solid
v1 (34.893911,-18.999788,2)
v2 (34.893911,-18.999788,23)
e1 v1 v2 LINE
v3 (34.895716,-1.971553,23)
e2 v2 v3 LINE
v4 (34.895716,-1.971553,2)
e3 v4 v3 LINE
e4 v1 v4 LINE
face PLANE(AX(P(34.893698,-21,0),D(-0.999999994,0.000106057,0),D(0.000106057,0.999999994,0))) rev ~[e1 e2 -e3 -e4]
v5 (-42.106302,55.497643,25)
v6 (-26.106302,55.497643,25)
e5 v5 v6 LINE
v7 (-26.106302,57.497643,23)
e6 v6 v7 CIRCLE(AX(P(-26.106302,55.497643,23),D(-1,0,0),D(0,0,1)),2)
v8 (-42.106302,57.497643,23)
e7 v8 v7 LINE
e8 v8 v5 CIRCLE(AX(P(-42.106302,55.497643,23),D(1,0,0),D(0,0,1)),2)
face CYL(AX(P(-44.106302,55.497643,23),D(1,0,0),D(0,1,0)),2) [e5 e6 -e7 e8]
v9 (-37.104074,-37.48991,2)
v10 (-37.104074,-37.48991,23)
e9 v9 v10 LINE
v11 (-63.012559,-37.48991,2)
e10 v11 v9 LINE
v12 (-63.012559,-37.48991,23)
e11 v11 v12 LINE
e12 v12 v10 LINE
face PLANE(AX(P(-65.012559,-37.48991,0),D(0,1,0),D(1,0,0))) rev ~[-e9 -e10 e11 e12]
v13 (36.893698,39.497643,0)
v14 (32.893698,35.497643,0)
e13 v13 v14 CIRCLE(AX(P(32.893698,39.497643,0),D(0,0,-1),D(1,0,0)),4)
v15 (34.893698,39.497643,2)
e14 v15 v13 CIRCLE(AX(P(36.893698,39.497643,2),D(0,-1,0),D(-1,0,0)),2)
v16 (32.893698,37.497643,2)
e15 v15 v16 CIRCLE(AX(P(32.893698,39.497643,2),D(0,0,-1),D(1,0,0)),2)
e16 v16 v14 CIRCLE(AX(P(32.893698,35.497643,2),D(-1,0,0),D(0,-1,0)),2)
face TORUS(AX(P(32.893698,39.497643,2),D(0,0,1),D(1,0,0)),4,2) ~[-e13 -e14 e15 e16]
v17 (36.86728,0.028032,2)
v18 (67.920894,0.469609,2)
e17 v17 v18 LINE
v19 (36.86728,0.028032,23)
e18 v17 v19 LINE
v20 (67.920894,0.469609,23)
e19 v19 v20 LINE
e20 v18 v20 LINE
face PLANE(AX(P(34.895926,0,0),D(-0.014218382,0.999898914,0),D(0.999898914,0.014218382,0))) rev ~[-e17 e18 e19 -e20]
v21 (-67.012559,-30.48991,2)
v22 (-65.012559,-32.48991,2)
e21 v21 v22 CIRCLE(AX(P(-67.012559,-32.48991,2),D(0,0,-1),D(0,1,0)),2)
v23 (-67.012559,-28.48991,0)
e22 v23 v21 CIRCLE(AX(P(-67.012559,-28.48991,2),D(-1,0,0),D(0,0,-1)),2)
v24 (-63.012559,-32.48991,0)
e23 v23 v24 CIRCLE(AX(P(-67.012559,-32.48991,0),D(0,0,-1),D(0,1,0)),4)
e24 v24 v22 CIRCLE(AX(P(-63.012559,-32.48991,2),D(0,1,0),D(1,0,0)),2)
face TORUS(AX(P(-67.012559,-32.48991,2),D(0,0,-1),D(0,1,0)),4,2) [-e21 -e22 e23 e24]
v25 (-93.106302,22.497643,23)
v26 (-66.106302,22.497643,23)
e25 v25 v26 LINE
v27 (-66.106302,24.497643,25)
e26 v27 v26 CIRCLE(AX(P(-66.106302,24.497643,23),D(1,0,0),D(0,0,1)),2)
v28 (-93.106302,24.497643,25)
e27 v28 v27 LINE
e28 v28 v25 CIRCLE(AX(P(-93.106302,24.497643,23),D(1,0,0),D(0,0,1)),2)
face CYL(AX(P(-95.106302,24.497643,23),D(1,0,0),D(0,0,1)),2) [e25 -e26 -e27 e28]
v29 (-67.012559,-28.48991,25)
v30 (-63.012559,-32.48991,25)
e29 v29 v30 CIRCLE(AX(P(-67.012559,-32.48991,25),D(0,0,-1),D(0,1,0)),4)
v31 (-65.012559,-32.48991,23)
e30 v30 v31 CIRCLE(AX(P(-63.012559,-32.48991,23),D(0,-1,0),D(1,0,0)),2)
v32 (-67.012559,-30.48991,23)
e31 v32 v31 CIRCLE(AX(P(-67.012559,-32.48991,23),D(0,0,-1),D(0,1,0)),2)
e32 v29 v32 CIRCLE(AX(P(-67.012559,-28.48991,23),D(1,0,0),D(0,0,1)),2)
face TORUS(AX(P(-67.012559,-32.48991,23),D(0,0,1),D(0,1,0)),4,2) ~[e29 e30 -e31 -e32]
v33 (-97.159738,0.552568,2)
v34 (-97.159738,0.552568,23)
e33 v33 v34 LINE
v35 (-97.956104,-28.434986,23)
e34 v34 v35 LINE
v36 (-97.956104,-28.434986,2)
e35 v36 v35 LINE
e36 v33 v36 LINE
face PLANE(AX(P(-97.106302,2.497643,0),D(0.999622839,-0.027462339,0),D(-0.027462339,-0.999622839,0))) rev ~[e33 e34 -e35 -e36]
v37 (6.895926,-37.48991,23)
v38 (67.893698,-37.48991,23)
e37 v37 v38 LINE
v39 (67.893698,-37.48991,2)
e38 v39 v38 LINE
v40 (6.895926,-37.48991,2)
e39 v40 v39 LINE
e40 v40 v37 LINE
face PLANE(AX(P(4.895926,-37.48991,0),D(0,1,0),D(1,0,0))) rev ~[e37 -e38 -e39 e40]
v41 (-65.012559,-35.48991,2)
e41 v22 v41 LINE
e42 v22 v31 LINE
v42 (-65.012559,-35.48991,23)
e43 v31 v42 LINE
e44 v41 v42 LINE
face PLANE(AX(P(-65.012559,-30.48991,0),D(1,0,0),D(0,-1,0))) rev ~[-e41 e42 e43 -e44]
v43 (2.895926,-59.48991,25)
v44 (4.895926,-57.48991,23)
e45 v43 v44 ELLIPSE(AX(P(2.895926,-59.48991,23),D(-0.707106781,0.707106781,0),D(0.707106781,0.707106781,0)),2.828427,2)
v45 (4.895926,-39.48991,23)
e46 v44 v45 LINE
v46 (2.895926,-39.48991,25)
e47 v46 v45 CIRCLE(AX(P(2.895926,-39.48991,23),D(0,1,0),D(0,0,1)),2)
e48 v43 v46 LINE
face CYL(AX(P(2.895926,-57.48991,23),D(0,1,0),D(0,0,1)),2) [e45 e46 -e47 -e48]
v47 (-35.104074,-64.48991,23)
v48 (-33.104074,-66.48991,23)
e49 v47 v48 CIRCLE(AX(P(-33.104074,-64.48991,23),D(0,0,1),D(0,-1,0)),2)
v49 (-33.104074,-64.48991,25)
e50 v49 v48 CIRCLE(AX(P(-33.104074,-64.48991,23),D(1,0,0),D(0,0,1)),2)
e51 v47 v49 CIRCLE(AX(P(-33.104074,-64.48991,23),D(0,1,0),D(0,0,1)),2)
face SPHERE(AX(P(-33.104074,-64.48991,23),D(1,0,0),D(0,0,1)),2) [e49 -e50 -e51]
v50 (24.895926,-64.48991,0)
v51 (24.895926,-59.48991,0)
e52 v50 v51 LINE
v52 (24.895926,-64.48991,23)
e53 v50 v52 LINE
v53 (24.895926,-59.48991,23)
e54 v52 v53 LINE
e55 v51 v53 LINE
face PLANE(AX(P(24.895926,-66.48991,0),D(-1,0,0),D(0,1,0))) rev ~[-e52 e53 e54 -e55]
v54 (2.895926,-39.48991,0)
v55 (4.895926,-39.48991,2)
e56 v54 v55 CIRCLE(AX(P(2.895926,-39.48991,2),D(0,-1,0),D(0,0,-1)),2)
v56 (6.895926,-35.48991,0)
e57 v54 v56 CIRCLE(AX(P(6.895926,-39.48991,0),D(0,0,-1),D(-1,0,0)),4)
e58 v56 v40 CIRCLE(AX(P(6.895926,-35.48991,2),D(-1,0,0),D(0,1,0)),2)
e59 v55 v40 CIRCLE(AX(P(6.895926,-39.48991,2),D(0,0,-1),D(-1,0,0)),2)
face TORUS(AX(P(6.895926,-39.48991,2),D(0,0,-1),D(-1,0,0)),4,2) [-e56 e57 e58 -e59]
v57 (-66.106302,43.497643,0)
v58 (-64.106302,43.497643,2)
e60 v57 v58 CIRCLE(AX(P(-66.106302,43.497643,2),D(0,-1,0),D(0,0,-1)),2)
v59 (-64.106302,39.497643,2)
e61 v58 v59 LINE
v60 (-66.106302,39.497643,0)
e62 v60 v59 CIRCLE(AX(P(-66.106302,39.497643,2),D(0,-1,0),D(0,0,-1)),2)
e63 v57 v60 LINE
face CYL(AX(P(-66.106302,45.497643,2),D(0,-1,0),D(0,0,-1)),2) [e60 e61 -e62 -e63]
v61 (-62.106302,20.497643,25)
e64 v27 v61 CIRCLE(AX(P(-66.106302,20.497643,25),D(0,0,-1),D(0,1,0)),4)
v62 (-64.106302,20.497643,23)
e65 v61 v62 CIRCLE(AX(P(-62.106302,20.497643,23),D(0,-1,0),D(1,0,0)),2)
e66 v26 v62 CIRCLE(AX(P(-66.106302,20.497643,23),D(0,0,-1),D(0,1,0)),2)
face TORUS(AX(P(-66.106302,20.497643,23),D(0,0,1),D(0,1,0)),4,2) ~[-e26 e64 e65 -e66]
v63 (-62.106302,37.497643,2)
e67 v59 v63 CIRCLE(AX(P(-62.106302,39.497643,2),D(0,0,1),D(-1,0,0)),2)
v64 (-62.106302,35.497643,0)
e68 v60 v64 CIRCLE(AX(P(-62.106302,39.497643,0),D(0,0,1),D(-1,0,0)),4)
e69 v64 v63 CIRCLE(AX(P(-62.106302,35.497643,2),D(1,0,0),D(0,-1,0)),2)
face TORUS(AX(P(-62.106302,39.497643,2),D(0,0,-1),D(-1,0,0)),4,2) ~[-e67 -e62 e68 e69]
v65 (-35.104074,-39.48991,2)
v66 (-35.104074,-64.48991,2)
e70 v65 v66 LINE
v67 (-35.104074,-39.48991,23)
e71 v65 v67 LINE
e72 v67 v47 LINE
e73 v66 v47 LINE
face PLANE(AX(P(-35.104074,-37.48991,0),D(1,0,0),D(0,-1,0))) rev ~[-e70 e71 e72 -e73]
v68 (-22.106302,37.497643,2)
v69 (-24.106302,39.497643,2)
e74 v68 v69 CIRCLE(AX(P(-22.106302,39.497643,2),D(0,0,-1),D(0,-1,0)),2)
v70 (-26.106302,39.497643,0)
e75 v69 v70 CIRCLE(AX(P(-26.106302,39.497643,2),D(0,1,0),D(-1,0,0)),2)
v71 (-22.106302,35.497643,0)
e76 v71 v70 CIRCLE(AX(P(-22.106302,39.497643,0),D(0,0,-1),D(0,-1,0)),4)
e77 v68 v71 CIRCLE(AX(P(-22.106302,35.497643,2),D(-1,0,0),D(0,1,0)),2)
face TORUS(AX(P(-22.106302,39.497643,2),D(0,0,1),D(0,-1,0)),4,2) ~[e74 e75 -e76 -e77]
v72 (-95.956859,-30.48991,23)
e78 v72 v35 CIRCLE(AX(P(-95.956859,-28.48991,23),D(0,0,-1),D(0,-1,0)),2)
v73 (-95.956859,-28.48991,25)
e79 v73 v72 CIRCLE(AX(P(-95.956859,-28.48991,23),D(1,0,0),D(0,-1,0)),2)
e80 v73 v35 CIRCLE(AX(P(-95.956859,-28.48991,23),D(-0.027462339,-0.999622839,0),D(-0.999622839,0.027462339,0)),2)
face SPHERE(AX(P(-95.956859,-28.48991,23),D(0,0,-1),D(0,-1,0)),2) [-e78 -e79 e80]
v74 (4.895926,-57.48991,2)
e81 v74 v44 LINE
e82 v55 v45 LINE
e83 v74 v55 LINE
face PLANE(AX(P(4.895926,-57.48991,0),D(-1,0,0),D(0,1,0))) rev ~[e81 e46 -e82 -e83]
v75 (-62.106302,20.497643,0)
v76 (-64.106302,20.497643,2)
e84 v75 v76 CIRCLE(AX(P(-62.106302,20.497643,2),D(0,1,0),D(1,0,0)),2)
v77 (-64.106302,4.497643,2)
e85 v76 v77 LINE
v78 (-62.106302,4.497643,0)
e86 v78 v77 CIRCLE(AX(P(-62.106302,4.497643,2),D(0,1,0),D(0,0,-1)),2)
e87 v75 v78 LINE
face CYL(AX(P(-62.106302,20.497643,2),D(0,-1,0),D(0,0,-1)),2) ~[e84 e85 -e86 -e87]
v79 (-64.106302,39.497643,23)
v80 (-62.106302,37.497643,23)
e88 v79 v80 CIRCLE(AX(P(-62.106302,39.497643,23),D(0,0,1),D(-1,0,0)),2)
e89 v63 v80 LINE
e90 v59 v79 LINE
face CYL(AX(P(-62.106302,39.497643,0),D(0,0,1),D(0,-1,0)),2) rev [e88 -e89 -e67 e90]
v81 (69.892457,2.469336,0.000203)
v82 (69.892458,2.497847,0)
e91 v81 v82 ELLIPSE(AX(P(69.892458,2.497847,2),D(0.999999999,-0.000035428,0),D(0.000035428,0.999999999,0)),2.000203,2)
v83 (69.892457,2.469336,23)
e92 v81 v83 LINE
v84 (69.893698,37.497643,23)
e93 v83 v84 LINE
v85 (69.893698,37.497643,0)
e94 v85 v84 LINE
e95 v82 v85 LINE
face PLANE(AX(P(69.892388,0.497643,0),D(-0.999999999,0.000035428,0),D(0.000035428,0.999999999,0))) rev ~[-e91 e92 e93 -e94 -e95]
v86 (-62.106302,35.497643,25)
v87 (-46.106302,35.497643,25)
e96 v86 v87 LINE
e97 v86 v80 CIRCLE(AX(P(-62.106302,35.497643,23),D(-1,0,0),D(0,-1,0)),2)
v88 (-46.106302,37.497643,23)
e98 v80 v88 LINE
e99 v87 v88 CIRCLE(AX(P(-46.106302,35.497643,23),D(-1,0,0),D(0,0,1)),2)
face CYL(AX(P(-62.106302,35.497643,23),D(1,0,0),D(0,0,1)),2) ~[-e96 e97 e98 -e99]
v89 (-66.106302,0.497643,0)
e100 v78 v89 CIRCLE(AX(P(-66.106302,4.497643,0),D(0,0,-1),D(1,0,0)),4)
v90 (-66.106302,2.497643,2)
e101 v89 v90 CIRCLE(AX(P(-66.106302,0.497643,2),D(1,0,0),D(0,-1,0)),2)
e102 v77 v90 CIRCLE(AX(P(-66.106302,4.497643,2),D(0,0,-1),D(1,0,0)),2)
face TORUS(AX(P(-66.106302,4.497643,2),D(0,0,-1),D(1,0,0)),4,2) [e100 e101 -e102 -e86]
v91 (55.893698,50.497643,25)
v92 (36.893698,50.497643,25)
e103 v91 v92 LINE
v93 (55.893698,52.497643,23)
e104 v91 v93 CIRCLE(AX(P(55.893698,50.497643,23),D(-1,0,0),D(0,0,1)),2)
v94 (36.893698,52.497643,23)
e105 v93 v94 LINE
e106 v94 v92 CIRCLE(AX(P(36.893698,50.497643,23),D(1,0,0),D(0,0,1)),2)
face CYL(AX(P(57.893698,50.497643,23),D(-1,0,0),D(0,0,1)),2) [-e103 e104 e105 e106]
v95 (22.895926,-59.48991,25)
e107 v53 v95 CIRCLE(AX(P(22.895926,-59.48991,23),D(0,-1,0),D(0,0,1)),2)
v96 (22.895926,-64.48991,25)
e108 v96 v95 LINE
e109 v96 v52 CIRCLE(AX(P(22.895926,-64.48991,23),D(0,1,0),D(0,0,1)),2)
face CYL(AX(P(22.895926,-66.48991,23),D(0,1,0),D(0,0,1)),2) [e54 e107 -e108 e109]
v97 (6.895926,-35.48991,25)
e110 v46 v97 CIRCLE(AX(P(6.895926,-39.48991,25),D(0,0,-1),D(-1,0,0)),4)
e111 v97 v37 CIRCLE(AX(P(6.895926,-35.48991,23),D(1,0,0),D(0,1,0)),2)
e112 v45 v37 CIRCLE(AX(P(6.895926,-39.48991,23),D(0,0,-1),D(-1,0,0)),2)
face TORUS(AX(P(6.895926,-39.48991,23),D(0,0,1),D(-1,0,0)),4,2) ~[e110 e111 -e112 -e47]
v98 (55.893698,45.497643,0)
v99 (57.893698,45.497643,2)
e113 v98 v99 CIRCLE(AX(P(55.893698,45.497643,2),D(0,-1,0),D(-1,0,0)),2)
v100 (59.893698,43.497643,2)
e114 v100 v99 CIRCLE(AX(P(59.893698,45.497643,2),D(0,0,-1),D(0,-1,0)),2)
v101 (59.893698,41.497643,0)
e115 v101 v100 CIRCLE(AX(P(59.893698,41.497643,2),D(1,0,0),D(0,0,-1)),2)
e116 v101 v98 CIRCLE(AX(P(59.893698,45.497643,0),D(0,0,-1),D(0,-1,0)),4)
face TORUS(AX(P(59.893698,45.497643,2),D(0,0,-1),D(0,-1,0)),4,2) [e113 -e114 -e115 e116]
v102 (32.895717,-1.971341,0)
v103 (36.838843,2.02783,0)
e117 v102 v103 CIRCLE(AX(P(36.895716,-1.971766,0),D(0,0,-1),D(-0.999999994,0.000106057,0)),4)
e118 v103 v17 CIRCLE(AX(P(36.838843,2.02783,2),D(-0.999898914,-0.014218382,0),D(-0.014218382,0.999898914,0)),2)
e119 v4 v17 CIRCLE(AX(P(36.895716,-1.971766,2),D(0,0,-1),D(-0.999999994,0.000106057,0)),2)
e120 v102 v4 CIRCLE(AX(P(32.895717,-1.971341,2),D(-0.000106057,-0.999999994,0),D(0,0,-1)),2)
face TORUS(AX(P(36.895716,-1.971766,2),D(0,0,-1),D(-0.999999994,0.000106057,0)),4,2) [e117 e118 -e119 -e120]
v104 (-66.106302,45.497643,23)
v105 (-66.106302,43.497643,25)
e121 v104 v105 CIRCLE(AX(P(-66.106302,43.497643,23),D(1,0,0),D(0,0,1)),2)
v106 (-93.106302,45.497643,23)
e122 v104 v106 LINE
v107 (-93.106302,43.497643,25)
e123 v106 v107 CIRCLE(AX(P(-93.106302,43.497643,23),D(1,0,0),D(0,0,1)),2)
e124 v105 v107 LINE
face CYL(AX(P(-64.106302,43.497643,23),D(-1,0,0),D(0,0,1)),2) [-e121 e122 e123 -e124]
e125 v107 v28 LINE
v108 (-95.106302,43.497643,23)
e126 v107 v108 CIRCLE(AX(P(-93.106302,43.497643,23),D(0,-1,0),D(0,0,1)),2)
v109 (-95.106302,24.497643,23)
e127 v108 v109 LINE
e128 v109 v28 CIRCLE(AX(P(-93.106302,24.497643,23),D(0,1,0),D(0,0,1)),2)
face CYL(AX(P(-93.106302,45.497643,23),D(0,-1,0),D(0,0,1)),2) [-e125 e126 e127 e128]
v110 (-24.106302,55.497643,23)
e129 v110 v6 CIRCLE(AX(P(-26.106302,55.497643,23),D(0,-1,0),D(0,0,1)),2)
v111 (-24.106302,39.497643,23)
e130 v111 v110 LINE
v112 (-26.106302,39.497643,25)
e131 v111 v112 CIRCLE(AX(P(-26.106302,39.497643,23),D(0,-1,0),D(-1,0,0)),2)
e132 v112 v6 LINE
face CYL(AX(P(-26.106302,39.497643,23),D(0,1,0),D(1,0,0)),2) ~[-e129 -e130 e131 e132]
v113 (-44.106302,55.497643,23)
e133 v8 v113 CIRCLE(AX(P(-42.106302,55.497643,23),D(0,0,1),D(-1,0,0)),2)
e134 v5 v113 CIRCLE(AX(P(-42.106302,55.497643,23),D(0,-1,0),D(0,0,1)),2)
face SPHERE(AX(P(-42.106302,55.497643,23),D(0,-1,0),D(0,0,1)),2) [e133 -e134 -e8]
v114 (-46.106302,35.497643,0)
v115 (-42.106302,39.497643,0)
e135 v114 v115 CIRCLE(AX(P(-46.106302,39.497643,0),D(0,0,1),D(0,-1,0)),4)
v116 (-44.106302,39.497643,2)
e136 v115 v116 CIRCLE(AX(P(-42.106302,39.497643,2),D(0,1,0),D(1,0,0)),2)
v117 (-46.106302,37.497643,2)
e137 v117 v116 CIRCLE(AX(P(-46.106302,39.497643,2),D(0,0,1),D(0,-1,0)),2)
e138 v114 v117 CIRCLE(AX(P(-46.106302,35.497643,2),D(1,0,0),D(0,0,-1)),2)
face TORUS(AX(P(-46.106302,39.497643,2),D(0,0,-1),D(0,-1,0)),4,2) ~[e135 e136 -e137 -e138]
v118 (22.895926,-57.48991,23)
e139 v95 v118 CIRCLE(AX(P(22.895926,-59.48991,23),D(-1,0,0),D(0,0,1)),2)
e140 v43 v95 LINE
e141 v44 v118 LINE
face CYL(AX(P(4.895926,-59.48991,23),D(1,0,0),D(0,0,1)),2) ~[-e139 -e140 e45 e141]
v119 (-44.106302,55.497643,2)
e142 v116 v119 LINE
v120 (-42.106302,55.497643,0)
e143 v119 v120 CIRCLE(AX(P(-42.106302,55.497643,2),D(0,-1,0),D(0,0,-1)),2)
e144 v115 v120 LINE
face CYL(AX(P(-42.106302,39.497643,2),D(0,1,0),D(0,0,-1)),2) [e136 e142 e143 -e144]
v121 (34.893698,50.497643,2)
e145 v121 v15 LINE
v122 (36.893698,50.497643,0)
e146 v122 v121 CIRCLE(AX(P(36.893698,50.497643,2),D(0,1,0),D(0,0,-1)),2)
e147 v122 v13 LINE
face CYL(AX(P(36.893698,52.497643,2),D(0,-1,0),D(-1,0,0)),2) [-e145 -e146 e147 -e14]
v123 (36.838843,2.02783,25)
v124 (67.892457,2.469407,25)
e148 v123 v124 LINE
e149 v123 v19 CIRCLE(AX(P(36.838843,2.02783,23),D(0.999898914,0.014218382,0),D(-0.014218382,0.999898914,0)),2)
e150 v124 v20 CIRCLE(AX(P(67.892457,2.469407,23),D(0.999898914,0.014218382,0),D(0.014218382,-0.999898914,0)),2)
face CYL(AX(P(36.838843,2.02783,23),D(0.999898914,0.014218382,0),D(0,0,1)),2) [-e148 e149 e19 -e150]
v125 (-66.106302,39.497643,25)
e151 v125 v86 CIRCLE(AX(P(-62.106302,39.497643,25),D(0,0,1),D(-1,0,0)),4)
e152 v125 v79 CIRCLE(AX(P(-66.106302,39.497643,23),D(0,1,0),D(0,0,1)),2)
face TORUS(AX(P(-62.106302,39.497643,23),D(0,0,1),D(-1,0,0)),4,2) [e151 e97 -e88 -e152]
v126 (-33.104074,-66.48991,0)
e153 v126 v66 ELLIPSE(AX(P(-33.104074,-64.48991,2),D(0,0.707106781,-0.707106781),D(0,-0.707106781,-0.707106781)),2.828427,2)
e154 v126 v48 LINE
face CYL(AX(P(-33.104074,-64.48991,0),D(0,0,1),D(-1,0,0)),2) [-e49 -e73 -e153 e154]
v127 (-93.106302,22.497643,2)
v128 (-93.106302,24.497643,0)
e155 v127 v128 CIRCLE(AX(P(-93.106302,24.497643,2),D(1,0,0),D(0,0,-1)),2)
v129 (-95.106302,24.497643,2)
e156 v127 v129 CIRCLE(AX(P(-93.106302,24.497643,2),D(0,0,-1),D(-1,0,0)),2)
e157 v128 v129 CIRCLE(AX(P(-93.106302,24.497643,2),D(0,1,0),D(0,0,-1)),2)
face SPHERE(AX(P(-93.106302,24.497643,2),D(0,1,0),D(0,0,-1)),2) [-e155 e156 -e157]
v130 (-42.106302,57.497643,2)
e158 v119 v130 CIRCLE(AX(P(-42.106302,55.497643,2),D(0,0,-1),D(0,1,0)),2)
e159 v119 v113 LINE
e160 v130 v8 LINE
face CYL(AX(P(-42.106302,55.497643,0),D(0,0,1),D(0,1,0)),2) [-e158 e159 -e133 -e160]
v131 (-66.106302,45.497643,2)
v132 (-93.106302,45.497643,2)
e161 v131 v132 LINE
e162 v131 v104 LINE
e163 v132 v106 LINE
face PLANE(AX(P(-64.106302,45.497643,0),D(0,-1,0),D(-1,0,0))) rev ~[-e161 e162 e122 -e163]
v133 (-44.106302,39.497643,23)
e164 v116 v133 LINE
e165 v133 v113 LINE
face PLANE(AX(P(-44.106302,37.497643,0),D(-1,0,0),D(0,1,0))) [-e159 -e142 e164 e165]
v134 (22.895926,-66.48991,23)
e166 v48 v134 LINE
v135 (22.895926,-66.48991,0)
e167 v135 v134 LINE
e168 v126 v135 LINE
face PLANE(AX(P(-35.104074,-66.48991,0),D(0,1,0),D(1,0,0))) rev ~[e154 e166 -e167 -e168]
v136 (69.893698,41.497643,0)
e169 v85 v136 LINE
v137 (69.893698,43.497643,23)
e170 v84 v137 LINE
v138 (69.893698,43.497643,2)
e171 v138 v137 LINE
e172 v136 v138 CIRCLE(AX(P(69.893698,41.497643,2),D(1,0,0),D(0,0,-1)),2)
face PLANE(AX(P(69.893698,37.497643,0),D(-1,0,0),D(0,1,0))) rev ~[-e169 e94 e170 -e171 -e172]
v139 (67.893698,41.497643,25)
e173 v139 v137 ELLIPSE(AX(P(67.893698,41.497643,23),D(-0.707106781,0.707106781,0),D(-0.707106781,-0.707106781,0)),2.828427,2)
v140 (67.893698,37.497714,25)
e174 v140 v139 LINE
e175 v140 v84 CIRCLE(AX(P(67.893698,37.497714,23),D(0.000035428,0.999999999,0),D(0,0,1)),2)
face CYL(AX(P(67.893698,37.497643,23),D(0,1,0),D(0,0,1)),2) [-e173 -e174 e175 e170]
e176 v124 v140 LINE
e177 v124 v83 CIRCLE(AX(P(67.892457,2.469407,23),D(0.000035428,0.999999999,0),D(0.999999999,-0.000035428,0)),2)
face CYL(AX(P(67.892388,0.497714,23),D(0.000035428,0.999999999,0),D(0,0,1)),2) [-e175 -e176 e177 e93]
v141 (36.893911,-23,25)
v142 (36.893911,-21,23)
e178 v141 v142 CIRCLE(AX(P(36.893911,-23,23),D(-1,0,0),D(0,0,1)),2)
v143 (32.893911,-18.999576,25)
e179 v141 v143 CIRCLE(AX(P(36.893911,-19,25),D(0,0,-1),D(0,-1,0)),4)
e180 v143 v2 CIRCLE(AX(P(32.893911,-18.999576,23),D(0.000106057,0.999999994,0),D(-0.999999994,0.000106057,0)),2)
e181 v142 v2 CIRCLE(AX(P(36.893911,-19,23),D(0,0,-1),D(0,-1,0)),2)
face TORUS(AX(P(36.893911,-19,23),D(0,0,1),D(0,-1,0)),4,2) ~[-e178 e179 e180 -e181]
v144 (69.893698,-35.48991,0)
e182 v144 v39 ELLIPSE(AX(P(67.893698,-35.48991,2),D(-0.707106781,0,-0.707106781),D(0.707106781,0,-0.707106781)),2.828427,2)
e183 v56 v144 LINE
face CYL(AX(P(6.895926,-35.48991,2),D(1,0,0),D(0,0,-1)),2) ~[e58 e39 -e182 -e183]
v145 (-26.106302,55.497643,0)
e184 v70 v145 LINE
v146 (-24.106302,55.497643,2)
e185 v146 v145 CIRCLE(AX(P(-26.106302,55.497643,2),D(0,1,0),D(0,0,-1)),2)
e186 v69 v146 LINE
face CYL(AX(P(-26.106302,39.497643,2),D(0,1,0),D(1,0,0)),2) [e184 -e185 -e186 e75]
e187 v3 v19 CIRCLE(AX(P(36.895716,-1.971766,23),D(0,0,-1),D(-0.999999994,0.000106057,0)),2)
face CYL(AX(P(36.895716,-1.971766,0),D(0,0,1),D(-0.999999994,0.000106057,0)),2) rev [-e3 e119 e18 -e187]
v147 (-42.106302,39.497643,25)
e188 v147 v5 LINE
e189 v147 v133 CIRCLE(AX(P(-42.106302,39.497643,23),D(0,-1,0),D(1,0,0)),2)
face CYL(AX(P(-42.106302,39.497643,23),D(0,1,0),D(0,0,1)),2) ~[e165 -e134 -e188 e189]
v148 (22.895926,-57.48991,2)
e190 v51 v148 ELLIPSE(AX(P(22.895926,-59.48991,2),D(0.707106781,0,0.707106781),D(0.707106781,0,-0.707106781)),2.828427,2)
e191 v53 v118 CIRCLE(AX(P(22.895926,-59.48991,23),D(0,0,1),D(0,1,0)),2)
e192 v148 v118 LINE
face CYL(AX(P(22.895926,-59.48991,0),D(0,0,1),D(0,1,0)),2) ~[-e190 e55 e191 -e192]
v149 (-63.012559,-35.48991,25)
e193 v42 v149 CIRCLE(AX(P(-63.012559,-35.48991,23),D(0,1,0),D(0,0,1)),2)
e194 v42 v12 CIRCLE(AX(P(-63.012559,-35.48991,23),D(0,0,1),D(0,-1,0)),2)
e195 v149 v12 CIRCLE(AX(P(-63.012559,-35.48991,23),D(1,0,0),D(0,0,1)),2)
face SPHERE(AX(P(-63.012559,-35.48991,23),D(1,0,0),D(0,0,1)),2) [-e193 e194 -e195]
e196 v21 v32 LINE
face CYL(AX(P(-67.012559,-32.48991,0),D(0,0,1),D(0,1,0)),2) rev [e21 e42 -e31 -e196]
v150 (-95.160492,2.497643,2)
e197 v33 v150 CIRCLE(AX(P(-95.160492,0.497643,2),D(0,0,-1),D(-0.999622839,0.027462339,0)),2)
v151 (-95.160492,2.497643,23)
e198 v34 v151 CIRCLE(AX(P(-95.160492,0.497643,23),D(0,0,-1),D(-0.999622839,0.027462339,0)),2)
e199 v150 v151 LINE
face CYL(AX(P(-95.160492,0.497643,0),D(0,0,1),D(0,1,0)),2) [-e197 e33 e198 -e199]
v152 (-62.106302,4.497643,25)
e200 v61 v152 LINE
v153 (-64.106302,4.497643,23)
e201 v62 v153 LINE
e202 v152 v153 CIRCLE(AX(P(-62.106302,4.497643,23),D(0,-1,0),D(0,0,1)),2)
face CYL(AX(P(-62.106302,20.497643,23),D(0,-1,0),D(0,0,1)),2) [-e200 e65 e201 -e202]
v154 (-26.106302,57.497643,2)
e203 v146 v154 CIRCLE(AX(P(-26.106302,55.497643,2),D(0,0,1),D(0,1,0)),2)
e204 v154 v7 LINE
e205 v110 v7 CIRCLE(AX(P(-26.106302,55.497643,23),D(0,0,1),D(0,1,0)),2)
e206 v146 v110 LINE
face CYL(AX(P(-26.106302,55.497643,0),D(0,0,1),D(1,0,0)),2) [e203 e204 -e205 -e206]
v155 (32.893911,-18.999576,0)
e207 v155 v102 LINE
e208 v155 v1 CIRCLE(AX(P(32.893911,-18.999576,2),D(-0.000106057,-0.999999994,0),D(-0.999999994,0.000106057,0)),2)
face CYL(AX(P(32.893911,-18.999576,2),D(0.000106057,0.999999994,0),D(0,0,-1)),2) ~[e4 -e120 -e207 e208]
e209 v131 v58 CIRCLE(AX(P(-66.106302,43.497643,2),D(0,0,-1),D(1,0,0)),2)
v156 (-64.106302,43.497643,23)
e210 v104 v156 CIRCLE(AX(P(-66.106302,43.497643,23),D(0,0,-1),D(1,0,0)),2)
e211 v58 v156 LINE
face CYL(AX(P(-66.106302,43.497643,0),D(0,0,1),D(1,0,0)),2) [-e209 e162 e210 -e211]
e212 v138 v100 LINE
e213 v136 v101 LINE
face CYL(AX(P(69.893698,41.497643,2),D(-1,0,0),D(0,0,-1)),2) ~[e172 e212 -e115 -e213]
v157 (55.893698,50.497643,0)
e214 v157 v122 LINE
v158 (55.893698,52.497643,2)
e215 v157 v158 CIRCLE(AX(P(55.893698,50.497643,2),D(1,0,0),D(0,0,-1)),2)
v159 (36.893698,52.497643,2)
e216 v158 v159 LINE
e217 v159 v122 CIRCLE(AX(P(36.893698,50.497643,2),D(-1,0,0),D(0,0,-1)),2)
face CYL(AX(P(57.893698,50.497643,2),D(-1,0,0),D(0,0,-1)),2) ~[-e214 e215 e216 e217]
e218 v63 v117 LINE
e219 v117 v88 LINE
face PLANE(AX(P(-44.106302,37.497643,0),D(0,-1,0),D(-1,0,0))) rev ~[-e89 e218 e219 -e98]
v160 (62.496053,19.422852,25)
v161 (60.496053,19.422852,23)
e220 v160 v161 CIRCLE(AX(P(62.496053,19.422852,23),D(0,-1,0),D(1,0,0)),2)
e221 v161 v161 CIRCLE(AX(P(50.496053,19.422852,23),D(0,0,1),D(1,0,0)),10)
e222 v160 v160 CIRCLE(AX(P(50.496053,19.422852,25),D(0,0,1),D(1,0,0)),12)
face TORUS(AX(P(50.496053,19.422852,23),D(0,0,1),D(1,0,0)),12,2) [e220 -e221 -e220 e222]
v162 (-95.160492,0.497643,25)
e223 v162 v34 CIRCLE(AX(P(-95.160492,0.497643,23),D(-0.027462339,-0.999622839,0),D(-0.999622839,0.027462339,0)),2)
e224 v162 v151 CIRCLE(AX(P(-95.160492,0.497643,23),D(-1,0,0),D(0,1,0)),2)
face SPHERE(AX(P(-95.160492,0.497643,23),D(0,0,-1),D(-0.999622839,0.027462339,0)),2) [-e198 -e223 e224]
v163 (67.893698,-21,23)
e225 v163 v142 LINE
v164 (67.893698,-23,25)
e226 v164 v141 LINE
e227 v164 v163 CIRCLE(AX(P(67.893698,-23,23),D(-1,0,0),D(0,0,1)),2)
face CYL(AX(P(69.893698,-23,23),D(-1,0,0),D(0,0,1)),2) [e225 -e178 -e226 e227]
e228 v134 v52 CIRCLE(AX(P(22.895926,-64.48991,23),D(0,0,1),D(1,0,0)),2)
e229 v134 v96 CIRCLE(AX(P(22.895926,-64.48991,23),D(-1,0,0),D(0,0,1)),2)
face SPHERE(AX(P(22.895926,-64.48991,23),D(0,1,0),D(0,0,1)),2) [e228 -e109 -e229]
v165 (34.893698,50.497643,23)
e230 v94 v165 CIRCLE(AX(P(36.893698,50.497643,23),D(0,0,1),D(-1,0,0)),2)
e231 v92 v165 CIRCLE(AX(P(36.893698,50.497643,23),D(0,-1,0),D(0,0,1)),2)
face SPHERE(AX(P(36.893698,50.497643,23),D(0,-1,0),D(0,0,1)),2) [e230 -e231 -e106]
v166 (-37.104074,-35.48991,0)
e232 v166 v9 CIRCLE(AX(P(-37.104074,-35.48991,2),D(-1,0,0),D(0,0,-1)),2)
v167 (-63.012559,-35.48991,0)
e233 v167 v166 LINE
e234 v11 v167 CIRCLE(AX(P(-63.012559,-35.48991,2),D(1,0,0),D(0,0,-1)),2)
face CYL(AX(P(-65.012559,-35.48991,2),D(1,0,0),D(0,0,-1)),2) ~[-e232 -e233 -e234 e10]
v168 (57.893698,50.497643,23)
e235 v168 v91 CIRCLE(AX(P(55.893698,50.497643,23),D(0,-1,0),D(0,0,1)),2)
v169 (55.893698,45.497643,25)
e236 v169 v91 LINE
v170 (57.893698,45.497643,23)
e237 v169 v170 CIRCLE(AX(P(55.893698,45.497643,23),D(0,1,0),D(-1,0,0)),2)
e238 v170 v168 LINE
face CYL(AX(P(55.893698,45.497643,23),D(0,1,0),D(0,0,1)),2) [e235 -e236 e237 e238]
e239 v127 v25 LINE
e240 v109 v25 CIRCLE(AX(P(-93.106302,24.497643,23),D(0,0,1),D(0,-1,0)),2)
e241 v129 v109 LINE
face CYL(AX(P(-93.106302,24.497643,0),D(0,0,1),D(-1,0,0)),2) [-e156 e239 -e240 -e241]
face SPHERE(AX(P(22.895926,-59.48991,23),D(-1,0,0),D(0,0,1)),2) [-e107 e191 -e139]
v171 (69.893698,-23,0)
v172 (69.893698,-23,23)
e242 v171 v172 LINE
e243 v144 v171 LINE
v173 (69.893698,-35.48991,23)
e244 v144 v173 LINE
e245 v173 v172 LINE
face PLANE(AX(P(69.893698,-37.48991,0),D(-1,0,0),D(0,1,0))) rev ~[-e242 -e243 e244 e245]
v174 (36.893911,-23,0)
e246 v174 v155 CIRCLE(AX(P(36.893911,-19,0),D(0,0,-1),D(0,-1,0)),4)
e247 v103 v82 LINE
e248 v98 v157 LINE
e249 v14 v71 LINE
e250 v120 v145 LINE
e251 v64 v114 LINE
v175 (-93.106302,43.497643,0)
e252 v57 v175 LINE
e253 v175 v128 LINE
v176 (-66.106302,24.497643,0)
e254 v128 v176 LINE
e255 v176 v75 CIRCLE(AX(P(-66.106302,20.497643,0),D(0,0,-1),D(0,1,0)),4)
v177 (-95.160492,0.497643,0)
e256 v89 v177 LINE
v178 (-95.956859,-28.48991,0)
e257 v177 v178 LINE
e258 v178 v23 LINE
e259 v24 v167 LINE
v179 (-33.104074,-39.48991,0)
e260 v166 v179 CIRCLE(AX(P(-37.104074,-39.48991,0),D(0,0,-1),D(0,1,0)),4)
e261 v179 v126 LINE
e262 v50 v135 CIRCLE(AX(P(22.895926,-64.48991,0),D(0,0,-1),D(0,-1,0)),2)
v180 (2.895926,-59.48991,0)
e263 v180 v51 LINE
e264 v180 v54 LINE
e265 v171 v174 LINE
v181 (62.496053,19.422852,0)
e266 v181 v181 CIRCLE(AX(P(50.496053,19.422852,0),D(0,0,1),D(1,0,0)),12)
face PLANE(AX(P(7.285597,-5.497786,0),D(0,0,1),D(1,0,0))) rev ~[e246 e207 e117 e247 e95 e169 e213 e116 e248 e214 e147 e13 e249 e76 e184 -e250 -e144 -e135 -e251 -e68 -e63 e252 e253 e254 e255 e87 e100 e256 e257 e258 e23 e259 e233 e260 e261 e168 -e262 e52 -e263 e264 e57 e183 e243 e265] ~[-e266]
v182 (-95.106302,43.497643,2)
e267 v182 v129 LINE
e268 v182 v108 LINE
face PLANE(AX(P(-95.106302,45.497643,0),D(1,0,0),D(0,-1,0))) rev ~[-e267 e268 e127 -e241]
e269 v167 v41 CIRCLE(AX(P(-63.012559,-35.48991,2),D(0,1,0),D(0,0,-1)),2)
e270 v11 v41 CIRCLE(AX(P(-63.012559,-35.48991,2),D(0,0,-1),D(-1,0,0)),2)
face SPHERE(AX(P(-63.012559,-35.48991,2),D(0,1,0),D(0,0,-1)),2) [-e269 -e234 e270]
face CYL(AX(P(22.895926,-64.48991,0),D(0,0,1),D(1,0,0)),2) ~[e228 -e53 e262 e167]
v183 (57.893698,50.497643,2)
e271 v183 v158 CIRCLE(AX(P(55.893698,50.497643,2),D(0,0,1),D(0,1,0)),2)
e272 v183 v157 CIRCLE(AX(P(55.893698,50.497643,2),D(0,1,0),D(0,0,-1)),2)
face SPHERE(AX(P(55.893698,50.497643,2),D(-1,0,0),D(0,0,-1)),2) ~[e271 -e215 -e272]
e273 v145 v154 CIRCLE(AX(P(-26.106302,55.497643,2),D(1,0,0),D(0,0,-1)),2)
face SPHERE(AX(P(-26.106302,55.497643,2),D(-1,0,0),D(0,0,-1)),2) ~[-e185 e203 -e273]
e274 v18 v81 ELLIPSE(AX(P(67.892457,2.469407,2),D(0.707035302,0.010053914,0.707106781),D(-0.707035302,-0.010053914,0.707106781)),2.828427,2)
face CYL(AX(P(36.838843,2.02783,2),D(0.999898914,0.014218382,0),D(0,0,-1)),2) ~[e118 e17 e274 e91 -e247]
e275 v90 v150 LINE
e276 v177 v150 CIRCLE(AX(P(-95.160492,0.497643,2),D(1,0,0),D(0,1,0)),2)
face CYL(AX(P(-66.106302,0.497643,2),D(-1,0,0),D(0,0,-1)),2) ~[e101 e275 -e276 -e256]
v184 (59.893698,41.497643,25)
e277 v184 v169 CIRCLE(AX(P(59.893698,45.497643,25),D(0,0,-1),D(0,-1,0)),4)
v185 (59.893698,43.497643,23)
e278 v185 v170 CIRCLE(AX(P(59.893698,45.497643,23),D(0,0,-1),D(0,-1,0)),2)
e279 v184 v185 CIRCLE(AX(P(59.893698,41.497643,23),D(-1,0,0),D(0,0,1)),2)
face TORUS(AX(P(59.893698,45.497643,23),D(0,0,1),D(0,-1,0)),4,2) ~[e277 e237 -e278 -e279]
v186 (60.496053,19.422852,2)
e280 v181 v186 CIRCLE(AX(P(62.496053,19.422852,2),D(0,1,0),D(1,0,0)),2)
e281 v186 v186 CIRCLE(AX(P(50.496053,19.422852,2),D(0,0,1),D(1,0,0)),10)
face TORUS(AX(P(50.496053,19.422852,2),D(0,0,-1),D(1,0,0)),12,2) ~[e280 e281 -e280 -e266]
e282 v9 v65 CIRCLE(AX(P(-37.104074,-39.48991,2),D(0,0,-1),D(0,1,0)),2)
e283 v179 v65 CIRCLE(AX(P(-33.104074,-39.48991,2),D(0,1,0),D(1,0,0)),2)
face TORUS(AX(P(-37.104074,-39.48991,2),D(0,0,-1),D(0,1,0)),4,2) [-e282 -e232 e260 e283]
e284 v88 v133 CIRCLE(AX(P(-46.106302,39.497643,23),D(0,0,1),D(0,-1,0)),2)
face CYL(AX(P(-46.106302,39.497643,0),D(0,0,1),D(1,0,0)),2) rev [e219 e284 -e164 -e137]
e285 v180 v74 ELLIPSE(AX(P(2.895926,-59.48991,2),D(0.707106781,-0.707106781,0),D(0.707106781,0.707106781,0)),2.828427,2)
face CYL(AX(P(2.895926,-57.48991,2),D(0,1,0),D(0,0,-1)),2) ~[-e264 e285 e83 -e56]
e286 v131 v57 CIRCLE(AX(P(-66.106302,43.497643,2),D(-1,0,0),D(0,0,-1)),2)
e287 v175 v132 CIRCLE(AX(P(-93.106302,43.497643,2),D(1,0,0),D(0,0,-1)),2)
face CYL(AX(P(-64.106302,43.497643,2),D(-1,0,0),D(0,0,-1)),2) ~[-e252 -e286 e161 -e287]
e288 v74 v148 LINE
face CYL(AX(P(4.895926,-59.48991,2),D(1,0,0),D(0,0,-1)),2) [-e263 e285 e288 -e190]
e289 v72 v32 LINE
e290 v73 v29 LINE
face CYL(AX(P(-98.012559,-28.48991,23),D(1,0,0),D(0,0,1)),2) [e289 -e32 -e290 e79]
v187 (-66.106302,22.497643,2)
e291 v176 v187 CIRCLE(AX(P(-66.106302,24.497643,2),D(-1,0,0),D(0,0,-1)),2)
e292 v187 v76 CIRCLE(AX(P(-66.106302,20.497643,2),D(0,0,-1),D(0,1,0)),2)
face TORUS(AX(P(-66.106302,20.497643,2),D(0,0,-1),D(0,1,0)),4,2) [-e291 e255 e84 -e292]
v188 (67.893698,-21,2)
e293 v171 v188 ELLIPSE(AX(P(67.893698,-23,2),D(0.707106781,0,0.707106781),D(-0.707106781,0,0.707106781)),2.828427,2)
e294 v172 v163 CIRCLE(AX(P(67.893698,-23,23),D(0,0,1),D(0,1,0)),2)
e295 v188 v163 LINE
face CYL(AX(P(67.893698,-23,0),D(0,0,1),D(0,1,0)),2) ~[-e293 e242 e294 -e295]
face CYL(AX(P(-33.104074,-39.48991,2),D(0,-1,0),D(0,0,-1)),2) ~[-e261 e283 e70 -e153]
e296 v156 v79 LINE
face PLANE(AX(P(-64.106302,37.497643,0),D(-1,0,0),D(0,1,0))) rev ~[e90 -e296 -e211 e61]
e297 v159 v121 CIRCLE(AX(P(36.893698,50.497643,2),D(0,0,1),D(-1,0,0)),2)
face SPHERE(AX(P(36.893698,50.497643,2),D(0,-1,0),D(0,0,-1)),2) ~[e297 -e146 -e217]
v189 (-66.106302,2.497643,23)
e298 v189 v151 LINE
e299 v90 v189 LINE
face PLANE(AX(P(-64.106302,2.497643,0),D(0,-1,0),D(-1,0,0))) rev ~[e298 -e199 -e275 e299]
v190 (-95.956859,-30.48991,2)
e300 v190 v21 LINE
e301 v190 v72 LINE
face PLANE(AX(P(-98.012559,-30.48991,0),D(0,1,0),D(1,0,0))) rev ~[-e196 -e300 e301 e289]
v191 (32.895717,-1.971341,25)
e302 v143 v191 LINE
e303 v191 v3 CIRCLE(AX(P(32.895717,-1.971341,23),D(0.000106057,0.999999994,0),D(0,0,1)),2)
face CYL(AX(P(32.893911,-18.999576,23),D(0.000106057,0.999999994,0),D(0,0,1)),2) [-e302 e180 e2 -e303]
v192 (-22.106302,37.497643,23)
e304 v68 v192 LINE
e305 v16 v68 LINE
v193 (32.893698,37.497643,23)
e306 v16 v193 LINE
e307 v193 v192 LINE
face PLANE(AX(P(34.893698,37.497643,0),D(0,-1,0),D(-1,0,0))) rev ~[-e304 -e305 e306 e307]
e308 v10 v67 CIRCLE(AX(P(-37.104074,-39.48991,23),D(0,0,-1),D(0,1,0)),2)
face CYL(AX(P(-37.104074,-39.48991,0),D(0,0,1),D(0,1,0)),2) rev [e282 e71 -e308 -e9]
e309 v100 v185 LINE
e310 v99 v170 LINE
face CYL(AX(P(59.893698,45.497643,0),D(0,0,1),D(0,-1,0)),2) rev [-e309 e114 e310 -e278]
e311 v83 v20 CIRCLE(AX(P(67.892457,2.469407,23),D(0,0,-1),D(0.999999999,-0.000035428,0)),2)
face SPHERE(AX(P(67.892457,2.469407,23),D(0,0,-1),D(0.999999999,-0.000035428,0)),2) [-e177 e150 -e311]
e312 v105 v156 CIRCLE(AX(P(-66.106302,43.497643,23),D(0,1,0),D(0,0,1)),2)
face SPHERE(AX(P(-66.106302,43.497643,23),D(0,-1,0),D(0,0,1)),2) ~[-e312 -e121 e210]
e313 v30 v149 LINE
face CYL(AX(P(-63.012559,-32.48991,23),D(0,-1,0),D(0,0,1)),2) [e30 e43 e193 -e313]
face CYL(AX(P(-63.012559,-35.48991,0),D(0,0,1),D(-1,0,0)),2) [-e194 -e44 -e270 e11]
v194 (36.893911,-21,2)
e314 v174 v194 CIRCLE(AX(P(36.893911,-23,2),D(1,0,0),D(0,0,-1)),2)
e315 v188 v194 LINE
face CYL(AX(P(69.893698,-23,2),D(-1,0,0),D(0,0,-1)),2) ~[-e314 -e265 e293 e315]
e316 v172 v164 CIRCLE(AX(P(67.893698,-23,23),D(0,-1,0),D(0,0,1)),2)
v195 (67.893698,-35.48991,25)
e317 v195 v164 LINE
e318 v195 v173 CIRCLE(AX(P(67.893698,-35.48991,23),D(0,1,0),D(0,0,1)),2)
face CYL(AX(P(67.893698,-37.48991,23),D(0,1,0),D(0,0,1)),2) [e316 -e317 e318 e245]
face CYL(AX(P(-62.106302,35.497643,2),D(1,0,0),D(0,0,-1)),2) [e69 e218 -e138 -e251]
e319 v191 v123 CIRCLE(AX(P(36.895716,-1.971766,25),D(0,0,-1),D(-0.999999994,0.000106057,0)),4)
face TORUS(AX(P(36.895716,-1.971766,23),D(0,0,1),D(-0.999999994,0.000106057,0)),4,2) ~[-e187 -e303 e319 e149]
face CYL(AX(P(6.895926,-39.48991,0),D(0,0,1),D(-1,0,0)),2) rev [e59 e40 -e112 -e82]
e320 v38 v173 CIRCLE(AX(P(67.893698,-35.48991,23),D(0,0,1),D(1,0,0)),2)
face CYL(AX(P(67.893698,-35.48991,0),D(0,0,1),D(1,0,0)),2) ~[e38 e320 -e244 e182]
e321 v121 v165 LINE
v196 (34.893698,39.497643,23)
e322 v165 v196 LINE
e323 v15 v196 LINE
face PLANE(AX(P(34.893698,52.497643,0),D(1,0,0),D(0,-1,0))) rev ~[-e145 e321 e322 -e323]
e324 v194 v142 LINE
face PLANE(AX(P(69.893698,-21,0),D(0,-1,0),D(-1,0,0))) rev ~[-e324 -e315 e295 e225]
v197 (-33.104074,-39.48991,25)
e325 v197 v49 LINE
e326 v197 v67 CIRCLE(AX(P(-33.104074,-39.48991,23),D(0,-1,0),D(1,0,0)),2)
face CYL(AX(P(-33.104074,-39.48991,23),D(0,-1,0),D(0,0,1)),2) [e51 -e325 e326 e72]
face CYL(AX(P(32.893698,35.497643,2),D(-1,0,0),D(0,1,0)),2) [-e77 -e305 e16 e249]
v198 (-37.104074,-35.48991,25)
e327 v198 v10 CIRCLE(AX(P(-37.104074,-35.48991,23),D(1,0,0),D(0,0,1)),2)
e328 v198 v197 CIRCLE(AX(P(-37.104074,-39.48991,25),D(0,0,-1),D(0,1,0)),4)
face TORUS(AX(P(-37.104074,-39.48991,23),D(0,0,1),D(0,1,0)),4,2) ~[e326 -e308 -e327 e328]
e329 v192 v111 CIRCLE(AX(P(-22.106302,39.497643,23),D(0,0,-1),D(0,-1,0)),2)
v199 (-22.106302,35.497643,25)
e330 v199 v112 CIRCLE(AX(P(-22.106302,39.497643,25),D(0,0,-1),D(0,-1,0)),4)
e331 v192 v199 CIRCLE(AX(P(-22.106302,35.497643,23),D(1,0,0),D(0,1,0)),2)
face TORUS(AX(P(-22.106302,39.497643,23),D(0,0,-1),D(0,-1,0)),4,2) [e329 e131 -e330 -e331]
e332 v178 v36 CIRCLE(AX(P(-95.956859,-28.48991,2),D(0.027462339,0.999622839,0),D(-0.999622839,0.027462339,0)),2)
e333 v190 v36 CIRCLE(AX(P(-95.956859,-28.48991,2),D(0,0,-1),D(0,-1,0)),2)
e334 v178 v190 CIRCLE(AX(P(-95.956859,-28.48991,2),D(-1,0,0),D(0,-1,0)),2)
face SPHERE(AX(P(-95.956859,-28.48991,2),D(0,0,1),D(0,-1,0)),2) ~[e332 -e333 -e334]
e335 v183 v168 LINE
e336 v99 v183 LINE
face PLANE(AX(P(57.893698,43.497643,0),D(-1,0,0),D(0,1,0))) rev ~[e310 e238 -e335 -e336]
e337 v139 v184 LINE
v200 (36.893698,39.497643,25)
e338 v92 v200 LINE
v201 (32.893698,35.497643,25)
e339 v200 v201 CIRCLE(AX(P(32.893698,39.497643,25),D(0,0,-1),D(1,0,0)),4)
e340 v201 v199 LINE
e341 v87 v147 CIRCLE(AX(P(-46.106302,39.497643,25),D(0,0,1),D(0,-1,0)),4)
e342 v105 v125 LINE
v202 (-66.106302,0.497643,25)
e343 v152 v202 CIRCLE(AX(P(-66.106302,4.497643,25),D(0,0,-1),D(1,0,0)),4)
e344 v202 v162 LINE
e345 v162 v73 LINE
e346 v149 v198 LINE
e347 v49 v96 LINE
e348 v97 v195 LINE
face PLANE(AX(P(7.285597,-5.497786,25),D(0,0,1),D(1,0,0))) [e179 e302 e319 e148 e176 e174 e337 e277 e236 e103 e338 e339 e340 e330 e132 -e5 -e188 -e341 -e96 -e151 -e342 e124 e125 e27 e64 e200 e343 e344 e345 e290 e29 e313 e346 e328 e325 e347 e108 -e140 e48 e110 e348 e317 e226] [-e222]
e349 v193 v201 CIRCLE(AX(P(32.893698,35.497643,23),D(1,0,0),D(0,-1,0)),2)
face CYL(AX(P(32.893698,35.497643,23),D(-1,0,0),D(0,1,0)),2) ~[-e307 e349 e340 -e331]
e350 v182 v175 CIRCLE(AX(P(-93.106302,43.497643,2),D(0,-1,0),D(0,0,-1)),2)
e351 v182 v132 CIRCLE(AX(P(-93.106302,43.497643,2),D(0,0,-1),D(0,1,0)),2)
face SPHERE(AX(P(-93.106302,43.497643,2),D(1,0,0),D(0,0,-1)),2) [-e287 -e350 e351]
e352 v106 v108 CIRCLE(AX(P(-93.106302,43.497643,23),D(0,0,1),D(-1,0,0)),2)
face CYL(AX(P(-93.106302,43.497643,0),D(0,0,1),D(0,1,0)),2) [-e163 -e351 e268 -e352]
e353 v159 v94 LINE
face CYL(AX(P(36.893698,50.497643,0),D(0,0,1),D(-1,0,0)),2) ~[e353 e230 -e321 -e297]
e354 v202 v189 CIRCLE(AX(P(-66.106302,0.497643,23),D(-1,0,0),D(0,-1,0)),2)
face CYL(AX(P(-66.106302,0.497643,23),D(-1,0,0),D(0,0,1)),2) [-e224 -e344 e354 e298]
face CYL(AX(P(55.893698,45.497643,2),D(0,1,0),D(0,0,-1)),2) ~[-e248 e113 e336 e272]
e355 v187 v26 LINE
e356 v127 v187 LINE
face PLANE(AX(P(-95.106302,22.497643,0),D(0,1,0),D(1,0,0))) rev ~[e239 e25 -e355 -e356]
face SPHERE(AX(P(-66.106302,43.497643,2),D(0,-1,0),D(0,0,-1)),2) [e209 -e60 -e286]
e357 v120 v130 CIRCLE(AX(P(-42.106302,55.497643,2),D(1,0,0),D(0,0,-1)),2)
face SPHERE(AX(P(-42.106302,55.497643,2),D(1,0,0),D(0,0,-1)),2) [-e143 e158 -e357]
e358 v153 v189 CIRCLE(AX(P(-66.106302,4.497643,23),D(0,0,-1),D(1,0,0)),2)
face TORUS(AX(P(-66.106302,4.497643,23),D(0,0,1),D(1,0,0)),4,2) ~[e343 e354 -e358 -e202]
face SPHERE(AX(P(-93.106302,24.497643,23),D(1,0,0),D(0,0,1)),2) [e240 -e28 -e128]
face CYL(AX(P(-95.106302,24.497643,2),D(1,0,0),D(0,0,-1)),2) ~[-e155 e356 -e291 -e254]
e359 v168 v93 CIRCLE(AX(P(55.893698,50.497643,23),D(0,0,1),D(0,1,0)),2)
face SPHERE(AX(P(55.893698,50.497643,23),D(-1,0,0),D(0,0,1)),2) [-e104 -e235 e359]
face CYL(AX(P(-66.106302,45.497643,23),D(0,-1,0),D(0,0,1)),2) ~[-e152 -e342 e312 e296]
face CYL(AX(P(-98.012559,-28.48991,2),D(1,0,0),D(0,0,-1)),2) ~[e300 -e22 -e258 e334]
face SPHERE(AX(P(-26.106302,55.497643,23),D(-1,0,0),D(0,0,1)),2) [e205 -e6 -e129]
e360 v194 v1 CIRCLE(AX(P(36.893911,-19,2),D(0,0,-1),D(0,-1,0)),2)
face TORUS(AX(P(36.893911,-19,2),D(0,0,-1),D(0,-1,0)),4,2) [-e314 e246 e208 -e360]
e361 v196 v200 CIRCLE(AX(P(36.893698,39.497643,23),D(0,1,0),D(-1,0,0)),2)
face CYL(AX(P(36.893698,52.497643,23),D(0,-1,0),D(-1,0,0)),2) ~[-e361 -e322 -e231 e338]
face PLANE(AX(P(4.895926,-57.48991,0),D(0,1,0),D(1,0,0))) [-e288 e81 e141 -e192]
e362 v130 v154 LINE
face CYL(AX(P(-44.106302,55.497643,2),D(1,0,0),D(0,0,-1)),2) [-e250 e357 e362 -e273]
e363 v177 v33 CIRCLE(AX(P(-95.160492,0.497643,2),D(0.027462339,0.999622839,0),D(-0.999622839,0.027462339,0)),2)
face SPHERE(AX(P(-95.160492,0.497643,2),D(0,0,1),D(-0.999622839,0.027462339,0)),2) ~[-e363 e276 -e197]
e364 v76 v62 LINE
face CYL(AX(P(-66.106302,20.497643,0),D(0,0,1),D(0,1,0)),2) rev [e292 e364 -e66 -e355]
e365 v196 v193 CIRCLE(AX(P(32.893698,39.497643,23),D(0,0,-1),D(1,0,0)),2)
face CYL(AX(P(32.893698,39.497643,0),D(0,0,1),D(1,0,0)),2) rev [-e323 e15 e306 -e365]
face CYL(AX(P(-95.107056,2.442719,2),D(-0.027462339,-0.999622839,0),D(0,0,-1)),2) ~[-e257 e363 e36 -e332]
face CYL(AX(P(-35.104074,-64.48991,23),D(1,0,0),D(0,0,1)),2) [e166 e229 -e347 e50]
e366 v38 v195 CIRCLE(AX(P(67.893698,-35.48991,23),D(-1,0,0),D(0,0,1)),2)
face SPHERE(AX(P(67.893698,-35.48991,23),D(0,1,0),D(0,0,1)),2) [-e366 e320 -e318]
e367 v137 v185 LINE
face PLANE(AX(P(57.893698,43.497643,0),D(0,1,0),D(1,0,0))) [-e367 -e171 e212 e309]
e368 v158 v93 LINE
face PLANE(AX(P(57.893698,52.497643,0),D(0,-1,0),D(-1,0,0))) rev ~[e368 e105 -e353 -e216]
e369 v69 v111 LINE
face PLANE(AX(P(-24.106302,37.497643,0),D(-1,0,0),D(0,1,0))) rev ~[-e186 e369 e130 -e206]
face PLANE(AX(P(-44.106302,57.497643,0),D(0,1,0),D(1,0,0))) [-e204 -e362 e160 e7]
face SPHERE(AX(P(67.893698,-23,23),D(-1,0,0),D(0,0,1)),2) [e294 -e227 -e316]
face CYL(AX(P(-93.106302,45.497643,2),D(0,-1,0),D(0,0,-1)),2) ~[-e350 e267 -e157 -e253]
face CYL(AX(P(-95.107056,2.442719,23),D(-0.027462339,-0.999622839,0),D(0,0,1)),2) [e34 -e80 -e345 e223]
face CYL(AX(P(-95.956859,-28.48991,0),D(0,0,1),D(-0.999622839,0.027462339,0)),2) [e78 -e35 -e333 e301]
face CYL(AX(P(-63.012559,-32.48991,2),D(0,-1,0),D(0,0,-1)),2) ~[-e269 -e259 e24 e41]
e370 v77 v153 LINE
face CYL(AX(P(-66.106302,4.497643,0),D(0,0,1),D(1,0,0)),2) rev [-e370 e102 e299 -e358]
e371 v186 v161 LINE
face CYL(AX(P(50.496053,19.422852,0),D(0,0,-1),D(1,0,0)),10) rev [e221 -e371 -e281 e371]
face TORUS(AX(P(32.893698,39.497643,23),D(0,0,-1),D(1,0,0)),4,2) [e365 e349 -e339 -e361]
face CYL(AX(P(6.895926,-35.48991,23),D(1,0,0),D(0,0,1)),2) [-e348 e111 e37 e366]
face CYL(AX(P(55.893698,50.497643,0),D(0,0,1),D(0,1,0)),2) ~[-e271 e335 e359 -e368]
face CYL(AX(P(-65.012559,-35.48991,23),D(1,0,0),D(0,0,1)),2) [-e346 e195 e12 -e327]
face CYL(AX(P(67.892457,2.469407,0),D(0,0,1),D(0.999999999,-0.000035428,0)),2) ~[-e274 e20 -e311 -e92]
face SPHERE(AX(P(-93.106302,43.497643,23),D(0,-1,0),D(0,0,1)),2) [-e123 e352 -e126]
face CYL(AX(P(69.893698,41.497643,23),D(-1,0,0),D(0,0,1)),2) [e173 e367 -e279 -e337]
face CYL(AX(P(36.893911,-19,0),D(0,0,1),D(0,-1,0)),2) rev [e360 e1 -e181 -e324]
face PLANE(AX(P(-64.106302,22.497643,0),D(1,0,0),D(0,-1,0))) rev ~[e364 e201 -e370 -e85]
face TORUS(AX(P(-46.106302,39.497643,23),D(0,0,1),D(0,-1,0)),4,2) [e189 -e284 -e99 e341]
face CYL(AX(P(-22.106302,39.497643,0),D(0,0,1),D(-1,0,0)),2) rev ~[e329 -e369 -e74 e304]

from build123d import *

# Parameters (mm, degrees)
F0_W     = 20
F0_H     = 20
F0_H_2   = 9
F0_R     = 10
F0_W_2   = 12
F0_H_3   = 6
F1_DEPTH = 25
F2_F1_R  = 2
F2_F2_R  = 2


# Not quite as in the source:
# - a feature names something its author has since deleted; it is built from what else it names


with BuildPart() as f1:
    # F0 (on Top) → F1 (new body)
    with BuildSketch(Plane.XY):
        Polygon((34.8936983969, 37.4976433316), (-24.1063016031, 37.4976433316), (-44.1063016031, 37.4976433316), (-44.1063016031, 2.4976433316), (-45.1040744059, -37.48991035), (-35.1040744059, -37.48991035), (4.8959255941, -37.48991035), (34.8959255941, -37.48991035), (69.8936983969, -37.48991035), (69.8936983969, -20.9999998819), (34.8936983969, -20.9999998819), (34.8959255941, 0), align=None)
        Polygon((-44.1063016031, 2.4976433316), (-44.1063016031, 37.4976433316), (-64.1063016031, 37.4976433316), (-64.1063016031, 22.4976433316), (-64.1063016031, 2.4976433316), align=None)
        Polygon((-64.1063016031, 22.4976433316), (-64.1063016031, 37.4976433316), (-64.1063016031, 45.4976433316), (-95.1063016031, 45.4976433316), (-95.1063016031, 22.4976433316), align=None)
        with Locations((-34.1063016031, 47.4976433316)):
            Rectangle(F0_W, F0_H)
        Polygon((-45.1040744059, -37.48991035), (-44.1063016031, 2.4976433316), (-64.1063016031, 2.4976433316), (-65.0125588003, -30.48991035), (-65.0125588003, -37.48991035), align=None)
        Polygon((-65.0125588003, -30.48991035), (-64.1063016031, 2.4976433316), (-97.1063016031, 2.4976433316), (-98.0125588003, -30.48991035), align=None)
        Polygon((4.8959255941, -37.48991035), (-35.1040744059, -37.48991035), (-35.1040744059, -66.48991035), (4.8959255941, -66.48991035), (4.8959255941, -57.48991035), align=None)
        with Locations((14.8959255941, -61.98991035)):
            Rectangle(F0_W, F0_H_2)
        Polygon((57.8936983969, 37.4976433316), (34.8936983969, 37.4976433316), (34.8959255941, 0), (69.8923875736, 0.4976433634), (69.8936983969, 37.4976433316), align=None)
        with Locations((50.4960529506, 19.4228515029)):
            Circle(F0_R, mode=Mode.SUBTRACT)
        Polygon((34.8936983969, 52.4976433316), (34.8936983969, 37.4976433316), (57.8936983969, 37.4976433316), (57.8936983969, 43.4976433316), (57.8936983969, 52.4976433316), align=None)
        with Locations((63.8936983969, 40.4976433316)):
            Rectangle(F0_W_2, F0_H_3)
    extrude(amount=F1_DEPTH)

    # F2: fillet of radius 2 on 86 edges, made by hand

    # F2_f1
    f2_f1_edges = [f1.edges().sort_by_distance(p)[0] for p in [
        (-64.1063016031, 2.4976433316, 12.5),
        (57.8936983969, 43.4976433316, 12.5),
        (34.8936983969, -20.9999998819, 12.5),
        (-35.1040744059, -37.48991035, 12.5),
        (-64.1063016031, 22.4976433316, 12.5),
        (4.8959255941, -37.48991035, 12.5),
        (34.8959255941, 0, 12.5),
        (34.8936983969, 37.4976433316, 12.5),
        (-24.1063016031, 37.4976433316, 12.5),
        (-44.1063016031, 37.4976433316, 12.5),
        (-64.1063016031, 37.4976433316, 12.5),
        (-65.0125588003, -30.48991035, 12.5),
    ]]
    fillet(f2_f1_edges, radius=F2_F1_R)

    # F2_f2
    f2_f2_edges = [f1.edges().sort_by_distance(p)[0] for p in [
        (-44.1063016031, 48.4976433316, 25),
        (-34.1063016031, 57.4976433316, 25),
        (-24.1063016031, 48.4976433316, 25),
        (5.3936983969, 37.4976433316, 25),
        (34.8936983969, 45.9976433316, 25),
        (46.3936983969, 52.4976433316, 25),
        (57.8936983969, 48.9976433316, 25),
        (64.8936983969, 43.4976433316, 25),
        (69.8936983969, 40.4976433316, 25),
        (53.3798336479, 0.2628378314, 25),
        (34.8948135152, -10.485670591, 25),
        (53.3938044596, -20.9999998819, 25),
        (69.8936983969, -29.2449551159, 25),
        (38.3948119955, -37.48991035, 25),
        (4.8959255941, -48.48991035, 25),
        (14.8959255941, -57.48991035, 25),
        (24.8959255941, -61.98991035, 25),
        (-5.1040744059, -66.48991035, 25),
        (-35.1040744059, -52.98991035, 25),
        (-51.0583166031, -37.48991035, 25),
        (-65.0125588003, -34.98991035, 25),
        (-82.5125588003, -30.48991035, 25),
        (-97.5594302017, -13.9961335092, 25),
        (-81.6063016031, 2.4976433316, 25),
        (-64.1063016031, 12.4976433316, 25),
        (-80.6063016031, 22.4976433316, 25),
        (-95.1063016031, 33.9976433316, 25),
        (-79.6063016031, 45.4976433316, 25),
        (-64.1063016031, 42.4976433316, 25),
        (-54.1063016031, 37.4976433316, 25),
        (69.8930429853, 18.9976433475, 25),
        (-34.1063016031, 57.4976433316, 0),
        (-24.1063016031, 48.4976433316, 0),
        (5.3936983969, 37.4976433316, 0),
        (46.3936983969, 52.4976433316, 0),
        (34.8936983969, 45.9976433316, 0),
        (57.8936983969, 48.9976433316, 0),
        (64.8936983969, 43.4976433316, 0),
        (-44.1063016031, 48.4976433316, 0),
        (-54.1063016031, 37.4976433316, 0),
        (-79.6063016031, 45.4976433316, 0),
        (-95.1063016031, 33.9976433316, 0),
        (-80.6063016031, 22.4976433316, 0),
        (-64.1063016031, 12.4976433316, 0),
        (-81.6063016031, 2.4976433316, 0),
        (-98.0125588003, -30.48991035, 12.5),
        (4.8959255941, -48.48991035, 0),
        (14.8959255941, -57.48991035, 0),
        (38.3948119955, -37.48991035, 0),
        (53.3938044596, -20.9999998819, 0),
        (34.8948135152, -10.485670591, 0),
        (53.3798336479, 0.2628378314, 0),
        (-24.1063016031, 57.4976433316, 12.5),
        (-44.1063016031, 57.4976433316, 12.5),
        (-64.1063016031, 45.4976433316, 12.5),
        (-95.1063016031, 45.4976433316, 12.5),
        (57.8936983969, 52.4976433316, 12.5),
        (34.8936983969, 52.4976433316, 12.5),
        (-95.1063016031, 22.4976433316, 12.5),
        (-97.1063016031, 2.4976433316, 12.5),
        (-82.5125588003, -30.48991035, 0),
        (-65.0125588003, -34.98991035, 0),
        (-51.0583166031, -37.48991035, 0),
        (-65.0125588003, -37.48991035, 12.5),
        (-35.1040744059, -52.98991035, 0),
        (69.8923875736, 0.4976433634, 12.5),
        (24.8959255941, -57.48991035, 12.5),
        (24.8959255941, -66.48991035, 12.5),
        (69.8936983969, -37.48991035, 12.5),
        (69.8936983969, -20.9999998819, 12.5),
        (-35.1040744059, -66.48991035, 12.5),
        (-97.5594302017, -13.9961335092, 0),
        (40.4960529506, 19.4228515029, 0),
        (40.4960529506, 19.4228515029, 25),
        (-35.6898608435, -38.0756967876, 0),
        (-65.598345238, -31.0756967876, 0),
        (35.4715589556, -0.5675663509, 0),
        (35.4796219682, -20.4141384487, 0),
        (5.4817120317, -38.0756967876, 0),
        (-64.6920880407, 3.0834297692, 0),
        (-64.6920880407, 21.9118568939, 0),
        (-44.6920880407, 38.0834297692, 0),
        (-63.5205151654, 38.0834297692, 0),
        (58.4794848346, 44.0834297692, 0),
        (34.3079119593, 38.0834297692, 0),
        (-23.5205151654, 38.0834297692, 0),
        (-44.6920880407, 38.0834297692, 25),
        (-63.5205151654, 38.0834297692, 25),
        (-64.6920880407, 21.9118568939, 25),
        (-64.6920880407, 3.0834297692, 25),
        (-65.598345238, -31.0756967876, 25),
        (-35.6898608435, -38.0756967876, 25),
        (5.4817120317, -38.0756967876, 25),
        (35.4796219682, -20.4141384487, 25),
        (35.4715589556, -0.5675663509, 25),
        (58.4794848346, 44.0834297692, 25),
        (34.3079119593, 38.0834297692, 25),
        (-23.5205151654, 38.0834297692, 25),
    ]]
    fillet(f2_f2_edges, radius=F2_F2_R)


solid = f1.part
